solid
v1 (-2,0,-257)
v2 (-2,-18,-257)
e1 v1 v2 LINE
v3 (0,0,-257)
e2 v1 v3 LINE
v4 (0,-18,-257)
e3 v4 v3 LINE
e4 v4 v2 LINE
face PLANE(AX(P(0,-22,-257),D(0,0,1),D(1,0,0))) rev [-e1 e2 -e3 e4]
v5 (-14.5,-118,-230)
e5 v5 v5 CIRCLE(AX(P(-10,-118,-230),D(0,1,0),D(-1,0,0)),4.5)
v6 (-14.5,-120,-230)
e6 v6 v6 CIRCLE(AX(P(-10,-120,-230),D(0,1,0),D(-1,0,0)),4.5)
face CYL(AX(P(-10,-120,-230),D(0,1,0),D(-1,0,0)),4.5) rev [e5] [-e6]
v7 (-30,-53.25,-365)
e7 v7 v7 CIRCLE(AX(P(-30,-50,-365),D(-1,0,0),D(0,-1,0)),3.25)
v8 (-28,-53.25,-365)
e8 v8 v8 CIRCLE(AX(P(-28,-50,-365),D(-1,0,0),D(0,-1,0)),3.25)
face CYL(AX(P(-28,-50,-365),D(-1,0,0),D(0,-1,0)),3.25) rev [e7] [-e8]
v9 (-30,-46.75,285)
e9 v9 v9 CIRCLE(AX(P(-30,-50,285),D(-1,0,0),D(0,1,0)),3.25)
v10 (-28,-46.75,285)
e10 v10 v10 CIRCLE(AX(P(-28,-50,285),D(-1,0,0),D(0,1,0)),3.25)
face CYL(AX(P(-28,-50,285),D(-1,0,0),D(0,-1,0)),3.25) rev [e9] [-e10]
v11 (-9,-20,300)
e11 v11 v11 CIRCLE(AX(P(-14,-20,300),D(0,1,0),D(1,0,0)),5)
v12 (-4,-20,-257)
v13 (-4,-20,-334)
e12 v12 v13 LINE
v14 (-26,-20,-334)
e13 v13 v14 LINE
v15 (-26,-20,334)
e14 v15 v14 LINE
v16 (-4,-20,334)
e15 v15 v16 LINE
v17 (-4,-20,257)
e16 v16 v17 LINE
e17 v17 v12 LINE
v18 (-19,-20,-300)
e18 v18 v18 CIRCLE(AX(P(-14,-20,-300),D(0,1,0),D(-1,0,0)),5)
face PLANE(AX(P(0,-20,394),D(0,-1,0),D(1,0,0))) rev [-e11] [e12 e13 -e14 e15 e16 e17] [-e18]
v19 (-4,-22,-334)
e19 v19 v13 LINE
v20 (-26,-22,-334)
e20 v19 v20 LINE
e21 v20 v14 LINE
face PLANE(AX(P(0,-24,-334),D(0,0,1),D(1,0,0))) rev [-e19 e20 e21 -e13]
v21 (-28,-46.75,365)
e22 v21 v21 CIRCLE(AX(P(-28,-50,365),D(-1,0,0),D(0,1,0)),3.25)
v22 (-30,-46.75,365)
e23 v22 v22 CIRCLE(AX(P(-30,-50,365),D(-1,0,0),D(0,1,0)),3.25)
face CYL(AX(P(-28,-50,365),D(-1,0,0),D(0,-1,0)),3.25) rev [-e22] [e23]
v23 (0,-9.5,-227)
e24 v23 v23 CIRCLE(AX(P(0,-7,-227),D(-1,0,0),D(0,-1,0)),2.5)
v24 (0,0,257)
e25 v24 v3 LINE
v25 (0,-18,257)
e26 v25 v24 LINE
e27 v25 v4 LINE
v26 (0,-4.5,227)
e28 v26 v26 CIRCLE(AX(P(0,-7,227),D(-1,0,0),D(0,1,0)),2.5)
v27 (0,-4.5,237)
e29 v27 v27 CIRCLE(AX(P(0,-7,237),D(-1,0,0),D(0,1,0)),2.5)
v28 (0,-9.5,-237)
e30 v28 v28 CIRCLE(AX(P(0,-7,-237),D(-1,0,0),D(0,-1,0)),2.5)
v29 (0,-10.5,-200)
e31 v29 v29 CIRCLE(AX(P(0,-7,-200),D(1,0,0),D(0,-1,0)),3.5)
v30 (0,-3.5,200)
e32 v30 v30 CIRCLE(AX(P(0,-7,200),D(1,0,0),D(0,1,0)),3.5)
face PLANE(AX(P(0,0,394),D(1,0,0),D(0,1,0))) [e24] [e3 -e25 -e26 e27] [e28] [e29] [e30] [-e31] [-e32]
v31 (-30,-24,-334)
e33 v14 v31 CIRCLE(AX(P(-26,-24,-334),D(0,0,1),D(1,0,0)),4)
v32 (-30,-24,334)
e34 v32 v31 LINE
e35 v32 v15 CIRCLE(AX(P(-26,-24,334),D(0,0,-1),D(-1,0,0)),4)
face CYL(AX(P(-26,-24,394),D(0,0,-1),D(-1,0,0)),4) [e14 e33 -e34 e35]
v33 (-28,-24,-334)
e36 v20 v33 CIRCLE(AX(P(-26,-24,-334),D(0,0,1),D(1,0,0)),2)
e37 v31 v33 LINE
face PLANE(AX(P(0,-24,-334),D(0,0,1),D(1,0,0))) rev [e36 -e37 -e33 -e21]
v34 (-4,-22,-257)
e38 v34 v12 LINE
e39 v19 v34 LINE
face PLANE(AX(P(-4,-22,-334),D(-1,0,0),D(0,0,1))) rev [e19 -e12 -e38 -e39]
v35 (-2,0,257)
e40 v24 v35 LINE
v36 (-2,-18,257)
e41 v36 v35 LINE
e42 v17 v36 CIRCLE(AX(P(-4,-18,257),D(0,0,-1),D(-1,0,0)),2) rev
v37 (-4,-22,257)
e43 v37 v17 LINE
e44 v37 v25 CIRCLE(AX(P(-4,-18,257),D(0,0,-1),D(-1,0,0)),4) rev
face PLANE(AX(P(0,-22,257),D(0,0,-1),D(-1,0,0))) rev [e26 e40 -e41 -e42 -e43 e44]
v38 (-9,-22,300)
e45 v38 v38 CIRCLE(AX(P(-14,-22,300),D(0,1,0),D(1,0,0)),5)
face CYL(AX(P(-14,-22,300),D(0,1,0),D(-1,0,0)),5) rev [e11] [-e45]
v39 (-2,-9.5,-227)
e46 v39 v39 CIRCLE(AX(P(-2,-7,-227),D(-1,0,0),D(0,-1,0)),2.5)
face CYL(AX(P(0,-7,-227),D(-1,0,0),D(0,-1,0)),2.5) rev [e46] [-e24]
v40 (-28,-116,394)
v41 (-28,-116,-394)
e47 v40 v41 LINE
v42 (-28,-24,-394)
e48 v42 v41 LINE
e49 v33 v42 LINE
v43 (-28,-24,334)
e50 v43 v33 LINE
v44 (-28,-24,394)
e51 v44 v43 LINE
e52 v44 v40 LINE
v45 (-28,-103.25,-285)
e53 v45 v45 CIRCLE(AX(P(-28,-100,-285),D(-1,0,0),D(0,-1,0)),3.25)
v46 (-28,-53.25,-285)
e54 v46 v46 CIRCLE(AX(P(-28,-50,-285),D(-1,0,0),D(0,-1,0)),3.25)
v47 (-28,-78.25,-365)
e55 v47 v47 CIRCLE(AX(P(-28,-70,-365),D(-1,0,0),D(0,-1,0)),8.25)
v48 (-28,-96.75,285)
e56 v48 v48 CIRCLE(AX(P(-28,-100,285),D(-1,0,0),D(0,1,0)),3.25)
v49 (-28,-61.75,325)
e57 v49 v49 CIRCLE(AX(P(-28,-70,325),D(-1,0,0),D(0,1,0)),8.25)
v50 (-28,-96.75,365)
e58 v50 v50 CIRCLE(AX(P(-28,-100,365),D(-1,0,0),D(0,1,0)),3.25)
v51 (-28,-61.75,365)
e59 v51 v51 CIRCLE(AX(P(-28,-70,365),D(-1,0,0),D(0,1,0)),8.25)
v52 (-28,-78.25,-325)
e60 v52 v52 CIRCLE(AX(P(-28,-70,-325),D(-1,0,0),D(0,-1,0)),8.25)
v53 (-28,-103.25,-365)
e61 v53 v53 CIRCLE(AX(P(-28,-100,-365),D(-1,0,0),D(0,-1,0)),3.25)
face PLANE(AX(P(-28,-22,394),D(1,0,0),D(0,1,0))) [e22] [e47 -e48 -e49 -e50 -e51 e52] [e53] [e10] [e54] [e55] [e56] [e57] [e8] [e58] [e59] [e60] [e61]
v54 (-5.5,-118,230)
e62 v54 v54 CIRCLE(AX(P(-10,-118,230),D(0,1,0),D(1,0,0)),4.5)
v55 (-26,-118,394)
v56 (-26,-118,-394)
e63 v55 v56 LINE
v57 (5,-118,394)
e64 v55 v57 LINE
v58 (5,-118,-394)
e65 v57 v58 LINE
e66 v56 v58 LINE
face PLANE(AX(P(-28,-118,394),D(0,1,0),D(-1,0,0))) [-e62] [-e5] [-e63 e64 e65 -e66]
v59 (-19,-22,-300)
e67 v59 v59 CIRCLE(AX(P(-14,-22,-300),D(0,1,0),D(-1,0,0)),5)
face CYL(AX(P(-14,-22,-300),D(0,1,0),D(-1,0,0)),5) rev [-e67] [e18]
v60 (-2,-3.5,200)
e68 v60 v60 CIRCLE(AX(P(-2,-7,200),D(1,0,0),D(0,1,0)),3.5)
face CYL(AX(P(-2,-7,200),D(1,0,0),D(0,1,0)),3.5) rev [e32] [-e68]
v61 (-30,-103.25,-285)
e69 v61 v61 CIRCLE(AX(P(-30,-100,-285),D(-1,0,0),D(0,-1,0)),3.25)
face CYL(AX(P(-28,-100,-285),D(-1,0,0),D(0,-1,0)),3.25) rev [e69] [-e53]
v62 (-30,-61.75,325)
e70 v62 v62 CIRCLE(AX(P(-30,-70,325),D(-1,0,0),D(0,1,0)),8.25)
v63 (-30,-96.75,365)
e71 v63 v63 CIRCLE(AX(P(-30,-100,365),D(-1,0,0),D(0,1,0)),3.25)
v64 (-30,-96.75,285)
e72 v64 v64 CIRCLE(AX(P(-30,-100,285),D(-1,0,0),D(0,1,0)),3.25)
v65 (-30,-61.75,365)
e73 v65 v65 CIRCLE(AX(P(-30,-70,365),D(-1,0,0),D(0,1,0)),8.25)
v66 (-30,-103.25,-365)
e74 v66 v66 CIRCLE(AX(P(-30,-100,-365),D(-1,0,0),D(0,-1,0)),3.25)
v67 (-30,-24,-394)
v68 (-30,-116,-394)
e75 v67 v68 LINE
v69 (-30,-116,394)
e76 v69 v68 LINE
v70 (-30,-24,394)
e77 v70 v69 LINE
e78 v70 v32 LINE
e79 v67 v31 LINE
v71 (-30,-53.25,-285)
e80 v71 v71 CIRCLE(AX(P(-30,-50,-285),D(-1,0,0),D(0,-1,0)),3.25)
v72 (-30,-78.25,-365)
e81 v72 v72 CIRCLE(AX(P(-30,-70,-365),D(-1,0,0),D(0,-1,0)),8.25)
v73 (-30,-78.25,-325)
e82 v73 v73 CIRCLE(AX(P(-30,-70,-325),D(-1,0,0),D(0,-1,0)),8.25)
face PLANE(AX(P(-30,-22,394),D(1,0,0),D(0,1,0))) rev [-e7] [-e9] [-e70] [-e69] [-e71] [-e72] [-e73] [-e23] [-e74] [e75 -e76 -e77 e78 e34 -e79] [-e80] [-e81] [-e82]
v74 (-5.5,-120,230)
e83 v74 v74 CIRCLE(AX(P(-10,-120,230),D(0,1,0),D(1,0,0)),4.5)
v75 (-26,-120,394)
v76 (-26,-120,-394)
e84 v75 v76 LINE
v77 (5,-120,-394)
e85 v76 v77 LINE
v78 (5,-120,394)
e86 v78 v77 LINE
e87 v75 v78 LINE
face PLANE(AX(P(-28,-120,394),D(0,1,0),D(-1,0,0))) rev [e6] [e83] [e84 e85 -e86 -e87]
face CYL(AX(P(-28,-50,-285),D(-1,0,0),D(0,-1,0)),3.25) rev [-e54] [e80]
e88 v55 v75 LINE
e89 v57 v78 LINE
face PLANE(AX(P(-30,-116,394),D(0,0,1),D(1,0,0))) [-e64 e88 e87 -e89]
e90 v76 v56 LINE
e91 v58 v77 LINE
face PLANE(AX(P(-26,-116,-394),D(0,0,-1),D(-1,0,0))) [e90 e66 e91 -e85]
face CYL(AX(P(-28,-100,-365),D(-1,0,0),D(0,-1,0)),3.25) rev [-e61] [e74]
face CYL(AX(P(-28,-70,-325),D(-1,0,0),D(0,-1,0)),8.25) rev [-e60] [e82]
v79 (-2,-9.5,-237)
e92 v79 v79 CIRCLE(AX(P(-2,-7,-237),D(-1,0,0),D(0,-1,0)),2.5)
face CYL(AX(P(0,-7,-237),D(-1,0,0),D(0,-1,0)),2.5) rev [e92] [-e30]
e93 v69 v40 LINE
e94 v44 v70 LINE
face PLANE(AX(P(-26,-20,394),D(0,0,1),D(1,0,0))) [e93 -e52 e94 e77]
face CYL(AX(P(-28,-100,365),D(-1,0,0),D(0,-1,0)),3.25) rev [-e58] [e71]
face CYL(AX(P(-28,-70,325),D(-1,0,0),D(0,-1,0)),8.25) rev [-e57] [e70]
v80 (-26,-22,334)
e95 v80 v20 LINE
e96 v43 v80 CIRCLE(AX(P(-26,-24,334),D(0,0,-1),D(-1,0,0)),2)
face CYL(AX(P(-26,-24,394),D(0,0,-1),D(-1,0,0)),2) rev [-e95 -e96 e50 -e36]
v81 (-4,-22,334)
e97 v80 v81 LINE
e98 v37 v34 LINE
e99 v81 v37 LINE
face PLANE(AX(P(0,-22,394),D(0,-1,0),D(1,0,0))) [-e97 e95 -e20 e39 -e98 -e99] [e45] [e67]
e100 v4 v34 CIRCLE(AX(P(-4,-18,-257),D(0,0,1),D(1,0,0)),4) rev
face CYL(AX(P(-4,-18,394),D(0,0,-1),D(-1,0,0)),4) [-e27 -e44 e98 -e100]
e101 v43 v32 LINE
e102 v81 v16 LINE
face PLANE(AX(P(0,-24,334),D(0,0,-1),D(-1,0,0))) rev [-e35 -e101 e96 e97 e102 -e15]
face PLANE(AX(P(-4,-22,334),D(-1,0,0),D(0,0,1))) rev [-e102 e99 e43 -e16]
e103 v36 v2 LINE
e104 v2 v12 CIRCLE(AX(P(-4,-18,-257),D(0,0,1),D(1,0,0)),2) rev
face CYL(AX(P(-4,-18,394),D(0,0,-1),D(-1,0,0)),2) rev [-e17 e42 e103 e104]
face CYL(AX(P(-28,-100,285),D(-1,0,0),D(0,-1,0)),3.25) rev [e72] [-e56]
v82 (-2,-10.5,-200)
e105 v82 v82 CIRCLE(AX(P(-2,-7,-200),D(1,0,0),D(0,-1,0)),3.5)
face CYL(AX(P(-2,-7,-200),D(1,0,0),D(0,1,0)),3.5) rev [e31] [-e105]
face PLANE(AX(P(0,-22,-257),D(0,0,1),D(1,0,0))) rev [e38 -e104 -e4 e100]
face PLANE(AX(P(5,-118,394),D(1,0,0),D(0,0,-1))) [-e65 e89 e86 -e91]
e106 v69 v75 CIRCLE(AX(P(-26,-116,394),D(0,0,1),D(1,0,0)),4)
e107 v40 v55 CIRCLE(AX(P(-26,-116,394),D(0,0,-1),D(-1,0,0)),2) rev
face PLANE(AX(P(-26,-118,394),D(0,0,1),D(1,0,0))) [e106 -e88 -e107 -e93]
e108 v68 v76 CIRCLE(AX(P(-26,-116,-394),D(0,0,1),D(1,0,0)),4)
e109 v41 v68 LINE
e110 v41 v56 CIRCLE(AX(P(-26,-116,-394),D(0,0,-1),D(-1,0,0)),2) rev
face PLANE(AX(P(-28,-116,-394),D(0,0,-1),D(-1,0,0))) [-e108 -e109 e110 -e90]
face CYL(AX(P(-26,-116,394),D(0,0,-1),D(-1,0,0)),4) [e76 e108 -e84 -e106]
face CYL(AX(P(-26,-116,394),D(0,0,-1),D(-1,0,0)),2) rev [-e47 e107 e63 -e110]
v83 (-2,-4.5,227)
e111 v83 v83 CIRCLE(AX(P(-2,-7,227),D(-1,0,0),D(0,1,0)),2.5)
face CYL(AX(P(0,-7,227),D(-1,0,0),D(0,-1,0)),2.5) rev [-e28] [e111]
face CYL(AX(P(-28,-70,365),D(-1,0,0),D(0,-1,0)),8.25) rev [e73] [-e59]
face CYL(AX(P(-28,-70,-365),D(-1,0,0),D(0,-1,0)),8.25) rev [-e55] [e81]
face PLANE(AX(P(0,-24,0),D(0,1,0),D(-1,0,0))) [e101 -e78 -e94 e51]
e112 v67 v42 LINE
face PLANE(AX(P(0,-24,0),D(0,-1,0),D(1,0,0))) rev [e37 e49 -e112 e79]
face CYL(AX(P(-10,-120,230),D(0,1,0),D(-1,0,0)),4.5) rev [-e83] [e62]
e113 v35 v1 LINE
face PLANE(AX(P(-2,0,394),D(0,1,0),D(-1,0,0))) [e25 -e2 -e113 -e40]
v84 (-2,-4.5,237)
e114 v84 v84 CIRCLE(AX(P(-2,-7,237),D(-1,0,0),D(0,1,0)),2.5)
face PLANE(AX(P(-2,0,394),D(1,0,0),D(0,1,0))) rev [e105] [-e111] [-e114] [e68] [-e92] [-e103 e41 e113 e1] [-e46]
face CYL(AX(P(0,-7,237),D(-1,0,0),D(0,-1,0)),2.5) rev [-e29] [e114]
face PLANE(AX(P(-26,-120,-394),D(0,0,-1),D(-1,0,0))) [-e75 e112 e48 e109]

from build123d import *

# Parameters (mm, degrees)
SM_BASE_FLANGE_1_DEPTH = 394
SKETCH_6_W             = 30
SKETCH_6_H             = 60
CUT_EXTRUDE_1_DEPTH    = 24
CUT_EXTRUDE_START      = -22
SKETCH_11_W            = 4
SKETCH_11_H            = 77
CUT_EXTRUDE_6_DEPTH    = 22
SKETCH_8_R             = 8.25
SKETCH_8_R_2           = 3.25
CUT_EXTRUDE_3_DEPTH    = 10
SKETCH_12_R            = 2.5
CUT_EXTRUDE_7_DEPTH    = 10
SKETCH_13_R            = 5
CUT_EXTRUDE_8_DEPTH    = 10
SKETCH_14_R            = 4.5
CUT_EXTRUDE_9_DEPTH    = 10
SKETCH_15_R            = 3.5
CUT_EXTRUDE_10_DEPTH   = 10


# Sheet-metal steps are written as plain solids
with BuildPart() as part:
    # Sketch 1 → Базовая кромка1 (new, symmetric)
    with BuildSketch(Plane.XY):
        with BuildLine():
            Line((0, 0), (0, -18))
            ThreePointArc((0, -18), (-1.171572875, -20.828427125), (-4, -22))
            Line((-4, -22), (-26, -22))
            ThreePointArc((-26, -22), (-27.414213562, -22.585786438), (-28, -24))
            Line((-28, -24), (-28, -116))
            ThreePointArc((-28, -116), (-27.414213562, -117.414213562), (-26, -118))
            Line((-26, -118), (5, -118))
            Line((5, -118), (5, -120))
            Line((5, -120), (-26, -120))
            ThreePointArc((-26, -120), (-28.828427125, -118.828427125), (-30, -116))
            Line((-30, -116), (-30, -24))
            ThreePointArc((-30, -24), (-28.828427125, -21.171572875), (-26, -20))
            Line((-26, -20), (-4, -20))
            ThreePointArc((-4, -20), (-2.585786438, -19.414213562), (-2, -18))
            Line((-2, -18), (-2, 0))
            Line((-2, 0), (0, 0))
        make_face()
    extrude(amount=SM_BASE_FLANGE_1_DEPTH, both=True)

    # Эскиз6 → Вырез-Вытянуть1 (cut)
    with BuildSketch(Plane(origin=(0, 0, 0), x_dir=(1, 0, 0), z_dir=(0, 1, 0))):
        with Locations((-15, -364)):
            Rectangle(SKETCH_6_W, SKETCH_6_H)
        with Locations((-15, 364)):
            Rectangle(SKETCH_6_W, SKETCH_6_H)
    extrude(amount=-CUT_EXTRUDE_1_DEPTH, mode=Mode.SUBTRACT)

    # Эскиз11 → Вырез-Вытянуть6 (cut)
    with BuildSketch(Plane(origin=(0, 0, 0), x_dir=(1, 0, 0), z_dir=(0, 1, 0)).offset(CUT_EXTRUDE_START)):
        with Locations((-2, 295.5)):
            Rectangle(SKETCH_11_W, SKETCH_11_H)
        with Locations((-2, -295.5)):
            Rectangle(SKETCH_11_W, SKETCH_11_H)
    extrude(amount=CUT_EXTRUDE_6_DEPTH, mode=Mode.SUBTRACT)

    # Эскиз8 → Вырез-Вытянуть3 (cut)
    with BuildSketch(Plane.ZY.offset(30)):
        with Locations(Location((-365, -70, 0), (0, 0, 270))):
            Circle(SKETCH_8_R)
        with Locations(Location((-325, -70, 0), (0, 0, 270))):
            Circle(SKETCH_8_R)
        with Locations(Location((-365, -50, 0), (0, 0, 270))):
            Circle(SKETCH_8_R_2)
        with Locations(Location((-365, -100, 0), (0, 0, 270))):
            Circle(SKETCH_8_R_2)
        with Locations(Location((-285, -50, 0), (0, 0, 270))):
            Circle(SKETCH_8_R_2)
        with Locations(Location((-285, -100, 0), (0, 0, 270))):
            Circle(SKETCH_8_R_2)
        with Locations(Location((285, -100, 0), (0, 0, 90))):
            Circle(SKETCH_8_R_2)
        with Locations(Location((285, -50, 0), (0, 0, 90))):
            Circle(SKETCH_8_R_2)
        with Locations(Location((365, -100, 0), (0, 0, 90))):
            Circle(SKETCH_8_R_2)
        with Locations(Location((365, -50, 0), (0, 0, 90))):
            Circle(SKETCH_8_R_2)
        with Locations(Location((325, -70, 0), (0, 0, 90))):
            Circle(SKETCH_8_R)
        with Locations(Location((365, -70, 0), (0, 0, 90))):
            Circle(SKETCH_8_R)
    extrude(amount=-CUT_EXTRUDE_3_DEPTH, mode=Mode.SUBTRACT)

    # Эскиз12 → Вырез-Вытянуть7 (cut)
    with BuildSketch(Plane.ZY.offset(2)):
        with Locations(Location((-237, -7, 0), (0, 0, 270))):
            Circle(SKETCH_12_R)
        with Locations(Location((-227, -7, 0), (0, 0, 270))):
            Circle(SKETCH_12_R)
        with Locations(Location((227, -7, 0), (0, 0, 90))):
            Circle(SKETCH_12_R)
        with Locations(Location((237, -7, 0), (0, 0, 90))):
            Circle(SKETCH_12_R)
    extrude(amount=-CUT_EXTRUDE_7_DEPTH, mode=Mode.SUBTRACT)

    # Эскиз13 → Вырез-Вытянуть8 (cut)
    with BuildSketch(Plane(origin=(0, -20, 0), x_dir=(1, 0, 0), z_dir=(0, 1, 0))):
        with Locations(Location((-14, 300, 0), (0, 0, 180))):
            Circle(SKETCH_13_R)
        with Locations((-14, -300)):
            Circle(SKETCH_13_R)
    extrude(amount=-CUT_EXTRUDE_8_DEPTH, mode=Mode.SUBTRACT)

    # Эскиз14 → Вырез-Вытянуть9 (cut)
    with BuildSketch(Plane(origin=(0, -118, 0), x_dir=(1, 0, 0), z_dir=(0, 1, 0))):
        with Locations(Location((-10, 230, 0), (0, 0, 180))):
            Circle(SKETCH_14_R)
        with Locations((-10, -230)):
            Circle(SKETCH_14_R)
    extrude(amount=-CUT_EXTRUDE_9_DEPTH, mode=Mode.SUBTRACT)

    # Эскиз15 → Вырез-Вытянуть10 (cut)
    with BuildSketch(Plane(origin=(0, 0, 0), x_dir=(0, 0, -1), z_dir=(1, 0, 0))):
        with Locations(Location((-200, -7, 0), (0, 0, 90))):
            Circle(SKETCH_15_R)
        with Locations(Location((200, -7, 0), (0, 0, 270))):
            Circle(SKETCH_15_R)
    extrude(amount=-CUT_EXTRUDE_10_DEPTH, mode=Mode.SUBTRACT)


solid = part.part
